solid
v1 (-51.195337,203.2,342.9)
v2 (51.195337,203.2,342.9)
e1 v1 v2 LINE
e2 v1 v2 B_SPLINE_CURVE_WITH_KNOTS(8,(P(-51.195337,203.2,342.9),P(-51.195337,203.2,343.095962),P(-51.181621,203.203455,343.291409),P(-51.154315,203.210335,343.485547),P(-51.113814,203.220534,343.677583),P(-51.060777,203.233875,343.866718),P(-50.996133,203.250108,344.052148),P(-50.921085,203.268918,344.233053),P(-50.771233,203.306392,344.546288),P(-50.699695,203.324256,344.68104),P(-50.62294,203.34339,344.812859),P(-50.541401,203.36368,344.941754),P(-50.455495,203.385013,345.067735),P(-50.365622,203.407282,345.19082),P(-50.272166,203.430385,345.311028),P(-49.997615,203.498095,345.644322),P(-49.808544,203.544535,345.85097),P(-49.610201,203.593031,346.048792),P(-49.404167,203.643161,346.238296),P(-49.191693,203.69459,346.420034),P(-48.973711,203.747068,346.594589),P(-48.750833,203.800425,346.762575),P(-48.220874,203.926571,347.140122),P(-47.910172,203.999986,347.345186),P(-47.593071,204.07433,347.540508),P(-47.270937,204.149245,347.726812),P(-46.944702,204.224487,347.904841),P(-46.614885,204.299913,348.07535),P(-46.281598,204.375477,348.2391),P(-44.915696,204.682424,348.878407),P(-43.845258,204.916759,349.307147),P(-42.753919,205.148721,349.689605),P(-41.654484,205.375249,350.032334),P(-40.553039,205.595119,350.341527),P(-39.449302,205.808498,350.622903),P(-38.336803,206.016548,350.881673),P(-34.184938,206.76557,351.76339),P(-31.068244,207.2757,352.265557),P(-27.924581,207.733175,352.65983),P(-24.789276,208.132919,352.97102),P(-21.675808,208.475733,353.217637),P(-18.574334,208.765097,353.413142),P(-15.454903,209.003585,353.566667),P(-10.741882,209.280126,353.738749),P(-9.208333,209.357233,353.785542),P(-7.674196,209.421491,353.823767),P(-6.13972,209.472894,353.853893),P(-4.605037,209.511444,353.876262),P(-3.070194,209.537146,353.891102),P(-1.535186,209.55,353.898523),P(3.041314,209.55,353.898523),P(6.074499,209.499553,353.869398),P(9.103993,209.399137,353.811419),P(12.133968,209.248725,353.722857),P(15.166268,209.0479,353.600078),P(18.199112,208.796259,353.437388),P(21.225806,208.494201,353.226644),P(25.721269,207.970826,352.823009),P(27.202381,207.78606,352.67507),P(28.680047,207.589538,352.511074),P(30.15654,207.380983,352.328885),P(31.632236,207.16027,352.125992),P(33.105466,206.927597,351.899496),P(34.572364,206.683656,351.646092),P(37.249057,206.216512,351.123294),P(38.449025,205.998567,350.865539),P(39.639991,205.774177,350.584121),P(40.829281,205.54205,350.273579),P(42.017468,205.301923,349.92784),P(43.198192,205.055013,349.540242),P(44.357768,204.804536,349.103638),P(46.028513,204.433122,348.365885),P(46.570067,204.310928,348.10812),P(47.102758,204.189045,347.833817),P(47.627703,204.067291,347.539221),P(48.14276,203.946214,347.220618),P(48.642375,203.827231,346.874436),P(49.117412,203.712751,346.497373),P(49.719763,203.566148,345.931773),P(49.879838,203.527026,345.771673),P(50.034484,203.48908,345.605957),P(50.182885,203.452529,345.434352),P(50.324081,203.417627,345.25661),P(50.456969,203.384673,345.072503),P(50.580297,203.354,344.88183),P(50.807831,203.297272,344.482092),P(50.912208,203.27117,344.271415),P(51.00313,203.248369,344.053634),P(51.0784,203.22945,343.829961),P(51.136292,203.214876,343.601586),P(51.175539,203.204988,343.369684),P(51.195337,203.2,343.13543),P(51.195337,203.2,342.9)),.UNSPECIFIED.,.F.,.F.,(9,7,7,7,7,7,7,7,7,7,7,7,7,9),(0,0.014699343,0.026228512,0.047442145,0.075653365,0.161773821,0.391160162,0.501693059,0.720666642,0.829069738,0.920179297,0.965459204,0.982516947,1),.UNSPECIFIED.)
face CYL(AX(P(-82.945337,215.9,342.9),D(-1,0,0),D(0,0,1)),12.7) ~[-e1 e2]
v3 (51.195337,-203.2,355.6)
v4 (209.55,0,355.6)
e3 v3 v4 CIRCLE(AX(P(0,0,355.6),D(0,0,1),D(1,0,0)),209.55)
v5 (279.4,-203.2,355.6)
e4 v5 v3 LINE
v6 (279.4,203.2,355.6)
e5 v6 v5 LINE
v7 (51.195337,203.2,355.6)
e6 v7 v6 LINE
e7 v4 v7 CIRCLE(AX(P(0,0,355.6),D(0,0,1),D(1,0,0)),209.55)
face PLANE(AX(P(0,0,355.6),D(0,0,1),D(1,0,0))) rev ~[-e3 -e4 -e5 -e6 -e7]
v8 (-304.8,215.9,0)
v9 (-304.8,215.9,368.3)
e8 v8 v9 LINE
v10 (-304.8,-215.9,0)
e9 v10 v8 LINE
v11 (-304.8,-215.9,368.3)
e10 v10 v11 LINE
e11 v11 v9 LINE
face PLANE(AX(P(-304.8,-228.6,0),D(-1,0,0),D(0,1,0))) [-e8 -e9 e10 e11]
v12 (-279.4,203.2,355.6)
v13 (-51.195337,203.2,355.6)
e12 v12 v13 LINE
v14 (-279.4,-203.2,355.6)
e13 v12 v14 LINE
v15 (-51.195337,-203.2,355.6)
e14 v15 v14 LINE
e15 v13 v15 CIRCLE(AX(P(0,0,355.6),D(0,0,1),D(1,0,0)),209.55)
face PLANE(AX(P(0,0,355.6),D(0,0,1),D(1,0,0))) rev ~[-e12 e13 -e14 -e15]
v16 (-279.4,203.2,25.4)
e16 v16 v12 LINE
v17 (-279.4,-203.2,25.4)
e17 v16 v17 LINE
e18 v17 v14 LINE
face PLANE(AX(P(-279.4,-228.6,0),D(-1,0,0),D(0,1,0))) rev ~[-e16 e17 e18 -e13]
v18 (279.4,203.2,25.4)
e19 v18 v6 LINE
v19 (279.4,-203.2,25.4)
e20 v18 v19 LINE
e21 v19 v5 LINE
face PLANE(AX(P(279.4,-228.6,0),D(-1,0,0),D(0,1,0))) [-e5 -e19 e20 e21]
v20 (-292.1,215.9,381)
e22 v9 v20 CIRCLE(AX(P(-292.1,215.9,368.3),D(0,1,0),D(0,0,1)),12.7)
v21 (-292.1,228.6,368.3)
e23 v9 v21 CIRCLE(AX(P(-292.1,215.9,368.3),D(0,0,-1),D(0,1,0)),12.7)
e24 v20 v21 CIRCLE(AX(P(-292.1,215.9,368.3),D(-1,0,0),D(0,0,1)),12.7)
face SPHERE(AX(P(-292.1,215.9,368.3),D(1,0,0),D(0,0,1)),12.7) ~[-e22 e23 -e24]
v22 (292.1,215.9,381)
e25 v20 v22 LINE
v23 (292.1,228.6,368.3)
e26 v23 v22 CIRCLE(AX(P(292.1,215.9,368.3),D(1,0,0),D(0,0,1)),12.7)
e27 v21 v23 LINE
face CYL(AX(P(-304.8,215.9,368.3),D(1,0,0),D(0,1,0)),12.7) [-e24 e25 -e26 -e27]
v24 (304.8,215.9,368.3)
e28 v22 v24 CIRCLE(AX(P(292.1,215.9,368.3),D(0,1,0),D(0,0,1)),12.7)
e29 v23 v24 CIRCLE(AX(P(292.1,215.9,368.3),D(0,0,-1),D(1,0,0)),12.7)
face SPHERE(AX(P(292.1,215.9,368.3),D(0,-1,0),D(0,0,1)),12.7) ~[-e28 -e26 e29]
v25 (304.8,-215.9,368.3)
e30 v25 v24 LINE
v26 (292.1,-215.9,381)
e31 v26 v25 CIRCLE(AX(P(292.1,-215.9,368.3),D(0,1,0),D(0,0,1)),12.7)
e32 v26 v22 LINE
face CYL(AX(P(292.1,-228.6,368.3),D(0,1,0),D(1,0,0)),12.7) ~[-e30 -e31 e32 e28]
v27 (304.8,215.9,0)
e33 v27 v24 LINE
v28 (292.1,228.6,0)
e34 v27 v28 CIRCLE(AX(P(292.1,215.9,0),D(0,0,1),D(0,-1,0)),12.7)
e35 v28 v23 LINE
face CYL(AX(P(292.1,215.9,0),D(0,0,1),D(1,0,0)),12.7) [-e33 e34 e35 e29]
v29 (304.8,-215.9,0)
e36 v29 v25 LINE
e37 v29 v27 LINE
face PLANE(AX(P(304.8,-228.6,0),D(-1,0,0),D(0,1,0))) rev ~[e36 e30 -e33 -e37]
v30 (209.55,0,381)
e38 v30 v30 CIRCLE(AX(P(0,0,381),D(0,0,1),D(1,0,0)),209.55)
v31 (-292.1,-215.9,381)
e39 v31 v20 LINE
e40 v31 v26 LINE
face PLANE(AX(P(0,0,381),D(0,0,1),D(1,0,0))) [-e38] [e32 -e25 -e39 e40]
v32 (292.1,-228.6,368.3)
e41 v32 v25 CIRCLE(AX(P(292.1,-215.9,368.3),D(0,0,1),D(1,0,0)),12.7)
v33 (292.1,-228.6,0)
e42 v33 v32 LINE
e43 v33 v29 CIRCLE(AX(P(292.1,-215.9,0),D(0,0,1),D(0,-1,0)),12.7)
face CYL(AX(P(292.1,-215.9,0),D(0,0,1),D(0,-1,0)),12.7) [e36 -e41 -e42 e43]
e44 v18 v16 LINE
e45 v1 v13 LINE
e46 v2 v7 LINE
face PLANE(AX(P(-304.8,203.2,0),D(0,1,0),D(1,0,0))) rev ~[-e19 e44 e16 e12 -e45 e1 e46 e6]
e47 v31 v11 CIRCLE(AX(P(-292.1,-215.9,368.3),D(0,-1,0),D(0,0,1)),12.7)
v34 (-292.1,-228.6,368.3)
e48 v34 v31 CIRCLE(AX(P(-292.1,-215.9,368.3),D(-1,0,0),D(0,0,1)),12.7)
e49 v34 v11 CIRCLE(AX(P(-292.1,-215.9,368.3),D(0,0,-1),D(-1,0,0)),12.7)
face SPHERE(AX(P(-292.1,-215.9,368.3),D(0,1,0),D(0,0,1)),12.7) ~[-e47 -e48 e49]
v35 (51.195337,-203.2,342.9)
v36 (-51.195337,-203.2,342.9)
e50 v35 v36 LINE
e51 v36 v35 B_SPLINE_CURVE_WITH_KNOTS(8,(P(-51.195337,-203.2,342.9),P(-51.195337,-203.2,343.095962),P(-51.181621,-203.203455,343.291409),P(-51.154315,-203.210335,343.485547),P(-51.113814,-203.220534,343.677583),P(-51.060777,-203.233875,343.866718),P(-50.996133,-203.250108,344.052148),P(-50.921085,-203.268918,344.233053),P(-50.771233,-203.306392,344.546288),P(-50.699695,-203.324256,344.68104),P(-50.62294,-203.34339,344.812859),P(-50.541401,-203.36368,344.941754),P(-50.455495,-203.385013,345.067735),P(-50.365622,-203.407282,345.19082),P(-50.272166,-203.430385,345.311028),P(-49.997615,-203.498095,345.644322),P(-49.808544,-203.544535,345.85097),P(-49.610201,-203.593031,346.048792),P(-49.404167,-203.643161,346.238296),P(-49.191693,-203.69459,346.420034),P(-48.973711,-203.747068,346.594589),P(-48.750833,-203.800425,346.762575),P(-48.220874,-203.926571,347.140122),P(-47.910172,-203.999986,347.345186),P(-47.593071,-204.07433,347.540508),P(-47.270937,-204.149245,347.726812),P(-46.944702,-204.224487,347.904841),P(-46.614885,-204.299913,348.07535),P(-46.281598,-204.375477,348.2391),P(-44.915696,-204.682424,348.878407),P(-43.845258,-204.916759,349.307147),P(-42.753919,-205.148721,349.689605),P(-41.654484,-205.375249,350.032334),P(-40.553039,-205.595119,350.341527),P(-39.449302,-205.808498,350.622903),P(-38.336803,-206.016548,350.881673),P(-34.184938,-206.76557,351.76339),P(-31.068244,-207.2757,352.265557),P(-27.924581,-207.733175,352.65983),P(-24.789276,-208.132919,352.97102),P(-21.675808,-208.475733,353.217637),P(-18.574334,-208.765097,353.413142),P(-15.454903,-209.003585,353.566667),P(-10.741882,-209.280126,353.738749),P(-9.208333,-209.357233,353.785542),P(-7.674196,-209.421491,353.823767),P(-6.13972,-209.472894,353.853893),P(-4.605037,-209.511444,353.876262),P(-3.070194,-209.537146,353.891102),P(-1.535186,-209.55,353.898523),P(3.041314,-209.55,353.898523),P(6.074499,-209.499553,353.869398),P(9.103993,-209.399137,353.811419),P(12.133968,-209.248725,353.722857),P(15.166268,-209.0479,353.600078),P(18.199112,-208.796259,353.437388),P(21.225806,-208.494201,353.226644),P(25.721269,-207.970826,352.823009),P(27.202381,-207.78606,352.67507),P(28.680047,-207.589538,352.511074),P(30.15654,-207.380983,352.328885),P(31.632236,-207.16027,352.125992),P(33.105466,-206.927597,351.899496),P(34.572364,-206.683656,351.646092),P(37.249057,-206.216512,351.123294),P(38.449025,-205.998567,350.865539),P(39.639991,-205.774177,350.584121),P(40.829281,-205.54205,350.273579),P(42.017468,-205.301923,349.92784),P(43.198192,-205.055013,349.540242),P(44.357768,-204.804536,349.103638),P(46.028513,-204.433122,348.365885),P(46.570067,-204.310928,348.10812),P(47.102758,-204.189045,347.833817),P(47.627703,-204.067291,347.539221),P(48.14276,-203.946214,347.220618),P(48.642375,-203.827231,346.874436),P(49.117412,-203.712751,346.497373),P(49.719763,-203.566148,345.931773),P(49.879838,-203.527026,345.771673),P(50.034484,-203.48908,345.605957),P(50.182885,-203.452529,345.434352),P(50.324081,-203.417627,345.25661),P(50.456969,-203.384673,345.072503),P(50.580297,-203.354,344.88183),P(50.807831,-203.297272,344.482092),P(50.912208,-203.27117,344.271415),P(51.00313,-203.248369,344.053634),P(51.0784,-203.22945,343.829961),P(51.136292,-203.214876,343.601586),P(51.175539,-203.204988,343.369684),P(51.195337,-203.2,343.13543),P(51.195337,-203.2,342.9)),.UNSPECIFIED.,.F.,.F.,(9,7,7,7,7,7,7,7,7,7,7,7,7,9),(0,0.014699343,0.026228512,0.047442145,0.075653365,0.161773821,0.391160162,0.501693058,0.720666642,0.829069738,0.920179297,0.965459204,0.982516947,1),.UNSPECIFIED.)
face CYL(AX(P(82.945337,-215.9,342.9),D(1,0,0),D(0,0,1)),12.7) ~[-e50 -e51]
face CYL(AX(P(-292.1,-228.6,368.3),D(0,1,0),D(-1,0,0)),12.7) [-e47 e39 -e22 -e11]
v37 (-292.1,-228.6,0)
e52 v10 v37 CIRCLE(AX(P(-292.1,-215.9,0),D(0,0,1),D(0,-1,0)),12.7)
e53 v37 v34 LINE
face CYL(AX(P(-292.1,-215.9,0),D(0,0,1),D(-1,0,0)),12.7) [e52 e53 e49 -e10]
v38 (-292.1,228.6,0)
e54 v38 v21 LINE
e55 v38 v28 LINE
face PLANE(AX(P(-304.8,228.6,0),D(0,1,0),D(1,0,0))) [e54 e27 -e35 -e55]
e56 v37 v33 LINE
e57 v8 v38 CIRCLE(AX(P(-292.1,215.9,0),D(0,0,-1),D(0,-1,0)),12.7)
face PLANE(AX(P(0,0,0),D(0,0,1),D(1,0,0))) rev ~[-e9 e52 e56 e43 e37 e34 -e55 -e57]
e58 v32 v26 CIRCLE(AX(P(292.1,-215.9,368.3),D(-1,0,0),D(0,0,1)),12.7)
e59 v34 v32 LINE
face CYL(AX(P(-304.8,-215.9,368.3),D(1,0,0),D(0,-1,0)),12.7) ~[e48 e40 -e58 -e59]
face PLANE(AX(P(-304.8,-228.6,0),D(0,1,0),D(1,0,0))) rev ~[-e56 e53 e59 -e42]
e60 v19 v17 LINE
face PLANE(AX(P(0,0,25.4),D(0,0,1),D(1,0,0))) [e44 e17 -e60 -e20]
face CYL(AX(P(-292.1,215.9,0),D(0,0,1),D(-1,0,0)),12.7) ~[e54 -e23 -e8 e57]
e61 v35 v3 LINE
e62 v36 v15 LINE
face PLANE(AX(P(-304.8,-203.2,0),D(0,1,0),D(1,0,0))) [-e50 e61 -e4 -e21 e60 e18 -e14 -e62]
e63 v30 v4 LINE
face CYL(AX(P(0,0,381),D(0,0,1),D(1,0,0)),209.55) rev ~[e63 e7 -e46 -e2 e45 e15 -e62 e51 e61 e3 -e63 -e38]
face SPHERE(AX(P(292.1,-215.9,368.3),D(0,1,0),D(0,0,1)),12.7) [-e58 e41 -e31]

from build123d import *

# Parameters (mm, degrees)
F0_W         = 609.6
F0_H         = 457.2
F1_DEPTH     = 381
F2_R         = 12.7
F3_T         = -25.4
F4_R         = 209.55
F5_DEPTH     = 25.4
F6_T4_DEPTH  = 165.8906734034
F6_S5_R      = 209.55
F6_T6_DEPTH  = 85
F6_T10_DEPTH = 165.8906734034
F6_S11_R     = 209.55
F6_T12_DEPTH = 85


# Not quite as in the source:
# - a fillet or chamfer that OpenCascade refuses, or shapes differently, is made with other operations: its cross-section is extruded or revolved along the edge and cut away or added


with BuildPart() as f1:
    # F0 (on Top) → F1 (new body)
    with BuildSketch(Plane.XY):
        Rectangle(F0_W, F0_H)
    extrude(amount=F1_DEPTH)

    # F2
    f2_edges = [f1.edges().sort_by_distance(p)[0] for p in [
        (304.8, 0, 381),
        (0, 228.6, 381),
        (-304.8, 0, 381),
        (0, -228.6, 381),
        (-304.8, -228.6, 190.5),
        (304.8, -228.6, 190.5),
        (304.8, 228.6, 190.5),
        (-304.8, 228.6, 190.5),
    ]]
    fillet(f2_edges, radius=F2_R)

    # F3 (hollow: no face is removed)
    offset(amount=F3_T, mode=Mode.SUBTRACT)

    # F4 (on face) → F5 (cut)
    with BuildSketch(Plane.XY.offset(381)):
        Circle(F4_R)
    extrude(amount=-F5_DEPTH, mode=Mode.SUBTRACT)

    # F6: fillet of radius 12.7 on 2 edges, made by hand


with BuildPart() as f6_tool2:
    # F6_s3 → F6_t4 (new body)
    with BuildSketch(Plane.YZ.offset(82.9453367017)):
        with BuildLine():
            ThreePointArc((-215.9, 355.6), (-206.9197438789, 351.8802561211), (-203.2, 342.9))
            Line((-203.2, 342.9), (-203.2, 355.6))
            Line((-203.2, 355.6), (-215.9, 355.6))
        make_face()
    extrude(amount=-F6_T4_DEPTH)

    # F6_s5 → F6_t6 (intersect, symmetric)
    with BuildSketch(Plane.XY.offset(349.3)):
        Circle(F6_S5_R)
    extrude(amount=F6_T6_DEPTH, both=True, mode=Mode.INTERSECT)


with BuildPart() as f1_1:
    add(f1.part)

    # F6_t1: cut F6_tool2
    add(f6_tool2.part, mode=Mode.SUBTRACT)


with BuildPart() as f6_tool8:
    # F6_s9 → F6_t10 (new body)
    with BuildSketch(Plane.YZ.offset(-82.9453367017)):
        with BuildLine():
            ThreePointArc((215.9, 355.6), (206.9197438789, 351.8802561211), (203.2, 342.9))
            Line((203.2, 342.9), (203.2, 355.6))
            Line((203.2, 355.6), (215.9, 355.6))
        make_face()
    extrude(amount=F6_T10_DEPTH)

    # F6_s11 → F6_t12 (intersect, symmetric)
    with BuildSketch(Plane.XY.offset(349.3)):
        Circle(F6_S11_R)
    extrude(amount=F6_T12_DEPTH, both=True, mode=Mode.INTERSECT)


with BuildPart() as f1_2:
    add(f1_1.part)

    # F6_t7: cut F6_tool8
    add(f6_tool8.part, mode=Mode.SUBTRACT)


solid = f1_2.part
